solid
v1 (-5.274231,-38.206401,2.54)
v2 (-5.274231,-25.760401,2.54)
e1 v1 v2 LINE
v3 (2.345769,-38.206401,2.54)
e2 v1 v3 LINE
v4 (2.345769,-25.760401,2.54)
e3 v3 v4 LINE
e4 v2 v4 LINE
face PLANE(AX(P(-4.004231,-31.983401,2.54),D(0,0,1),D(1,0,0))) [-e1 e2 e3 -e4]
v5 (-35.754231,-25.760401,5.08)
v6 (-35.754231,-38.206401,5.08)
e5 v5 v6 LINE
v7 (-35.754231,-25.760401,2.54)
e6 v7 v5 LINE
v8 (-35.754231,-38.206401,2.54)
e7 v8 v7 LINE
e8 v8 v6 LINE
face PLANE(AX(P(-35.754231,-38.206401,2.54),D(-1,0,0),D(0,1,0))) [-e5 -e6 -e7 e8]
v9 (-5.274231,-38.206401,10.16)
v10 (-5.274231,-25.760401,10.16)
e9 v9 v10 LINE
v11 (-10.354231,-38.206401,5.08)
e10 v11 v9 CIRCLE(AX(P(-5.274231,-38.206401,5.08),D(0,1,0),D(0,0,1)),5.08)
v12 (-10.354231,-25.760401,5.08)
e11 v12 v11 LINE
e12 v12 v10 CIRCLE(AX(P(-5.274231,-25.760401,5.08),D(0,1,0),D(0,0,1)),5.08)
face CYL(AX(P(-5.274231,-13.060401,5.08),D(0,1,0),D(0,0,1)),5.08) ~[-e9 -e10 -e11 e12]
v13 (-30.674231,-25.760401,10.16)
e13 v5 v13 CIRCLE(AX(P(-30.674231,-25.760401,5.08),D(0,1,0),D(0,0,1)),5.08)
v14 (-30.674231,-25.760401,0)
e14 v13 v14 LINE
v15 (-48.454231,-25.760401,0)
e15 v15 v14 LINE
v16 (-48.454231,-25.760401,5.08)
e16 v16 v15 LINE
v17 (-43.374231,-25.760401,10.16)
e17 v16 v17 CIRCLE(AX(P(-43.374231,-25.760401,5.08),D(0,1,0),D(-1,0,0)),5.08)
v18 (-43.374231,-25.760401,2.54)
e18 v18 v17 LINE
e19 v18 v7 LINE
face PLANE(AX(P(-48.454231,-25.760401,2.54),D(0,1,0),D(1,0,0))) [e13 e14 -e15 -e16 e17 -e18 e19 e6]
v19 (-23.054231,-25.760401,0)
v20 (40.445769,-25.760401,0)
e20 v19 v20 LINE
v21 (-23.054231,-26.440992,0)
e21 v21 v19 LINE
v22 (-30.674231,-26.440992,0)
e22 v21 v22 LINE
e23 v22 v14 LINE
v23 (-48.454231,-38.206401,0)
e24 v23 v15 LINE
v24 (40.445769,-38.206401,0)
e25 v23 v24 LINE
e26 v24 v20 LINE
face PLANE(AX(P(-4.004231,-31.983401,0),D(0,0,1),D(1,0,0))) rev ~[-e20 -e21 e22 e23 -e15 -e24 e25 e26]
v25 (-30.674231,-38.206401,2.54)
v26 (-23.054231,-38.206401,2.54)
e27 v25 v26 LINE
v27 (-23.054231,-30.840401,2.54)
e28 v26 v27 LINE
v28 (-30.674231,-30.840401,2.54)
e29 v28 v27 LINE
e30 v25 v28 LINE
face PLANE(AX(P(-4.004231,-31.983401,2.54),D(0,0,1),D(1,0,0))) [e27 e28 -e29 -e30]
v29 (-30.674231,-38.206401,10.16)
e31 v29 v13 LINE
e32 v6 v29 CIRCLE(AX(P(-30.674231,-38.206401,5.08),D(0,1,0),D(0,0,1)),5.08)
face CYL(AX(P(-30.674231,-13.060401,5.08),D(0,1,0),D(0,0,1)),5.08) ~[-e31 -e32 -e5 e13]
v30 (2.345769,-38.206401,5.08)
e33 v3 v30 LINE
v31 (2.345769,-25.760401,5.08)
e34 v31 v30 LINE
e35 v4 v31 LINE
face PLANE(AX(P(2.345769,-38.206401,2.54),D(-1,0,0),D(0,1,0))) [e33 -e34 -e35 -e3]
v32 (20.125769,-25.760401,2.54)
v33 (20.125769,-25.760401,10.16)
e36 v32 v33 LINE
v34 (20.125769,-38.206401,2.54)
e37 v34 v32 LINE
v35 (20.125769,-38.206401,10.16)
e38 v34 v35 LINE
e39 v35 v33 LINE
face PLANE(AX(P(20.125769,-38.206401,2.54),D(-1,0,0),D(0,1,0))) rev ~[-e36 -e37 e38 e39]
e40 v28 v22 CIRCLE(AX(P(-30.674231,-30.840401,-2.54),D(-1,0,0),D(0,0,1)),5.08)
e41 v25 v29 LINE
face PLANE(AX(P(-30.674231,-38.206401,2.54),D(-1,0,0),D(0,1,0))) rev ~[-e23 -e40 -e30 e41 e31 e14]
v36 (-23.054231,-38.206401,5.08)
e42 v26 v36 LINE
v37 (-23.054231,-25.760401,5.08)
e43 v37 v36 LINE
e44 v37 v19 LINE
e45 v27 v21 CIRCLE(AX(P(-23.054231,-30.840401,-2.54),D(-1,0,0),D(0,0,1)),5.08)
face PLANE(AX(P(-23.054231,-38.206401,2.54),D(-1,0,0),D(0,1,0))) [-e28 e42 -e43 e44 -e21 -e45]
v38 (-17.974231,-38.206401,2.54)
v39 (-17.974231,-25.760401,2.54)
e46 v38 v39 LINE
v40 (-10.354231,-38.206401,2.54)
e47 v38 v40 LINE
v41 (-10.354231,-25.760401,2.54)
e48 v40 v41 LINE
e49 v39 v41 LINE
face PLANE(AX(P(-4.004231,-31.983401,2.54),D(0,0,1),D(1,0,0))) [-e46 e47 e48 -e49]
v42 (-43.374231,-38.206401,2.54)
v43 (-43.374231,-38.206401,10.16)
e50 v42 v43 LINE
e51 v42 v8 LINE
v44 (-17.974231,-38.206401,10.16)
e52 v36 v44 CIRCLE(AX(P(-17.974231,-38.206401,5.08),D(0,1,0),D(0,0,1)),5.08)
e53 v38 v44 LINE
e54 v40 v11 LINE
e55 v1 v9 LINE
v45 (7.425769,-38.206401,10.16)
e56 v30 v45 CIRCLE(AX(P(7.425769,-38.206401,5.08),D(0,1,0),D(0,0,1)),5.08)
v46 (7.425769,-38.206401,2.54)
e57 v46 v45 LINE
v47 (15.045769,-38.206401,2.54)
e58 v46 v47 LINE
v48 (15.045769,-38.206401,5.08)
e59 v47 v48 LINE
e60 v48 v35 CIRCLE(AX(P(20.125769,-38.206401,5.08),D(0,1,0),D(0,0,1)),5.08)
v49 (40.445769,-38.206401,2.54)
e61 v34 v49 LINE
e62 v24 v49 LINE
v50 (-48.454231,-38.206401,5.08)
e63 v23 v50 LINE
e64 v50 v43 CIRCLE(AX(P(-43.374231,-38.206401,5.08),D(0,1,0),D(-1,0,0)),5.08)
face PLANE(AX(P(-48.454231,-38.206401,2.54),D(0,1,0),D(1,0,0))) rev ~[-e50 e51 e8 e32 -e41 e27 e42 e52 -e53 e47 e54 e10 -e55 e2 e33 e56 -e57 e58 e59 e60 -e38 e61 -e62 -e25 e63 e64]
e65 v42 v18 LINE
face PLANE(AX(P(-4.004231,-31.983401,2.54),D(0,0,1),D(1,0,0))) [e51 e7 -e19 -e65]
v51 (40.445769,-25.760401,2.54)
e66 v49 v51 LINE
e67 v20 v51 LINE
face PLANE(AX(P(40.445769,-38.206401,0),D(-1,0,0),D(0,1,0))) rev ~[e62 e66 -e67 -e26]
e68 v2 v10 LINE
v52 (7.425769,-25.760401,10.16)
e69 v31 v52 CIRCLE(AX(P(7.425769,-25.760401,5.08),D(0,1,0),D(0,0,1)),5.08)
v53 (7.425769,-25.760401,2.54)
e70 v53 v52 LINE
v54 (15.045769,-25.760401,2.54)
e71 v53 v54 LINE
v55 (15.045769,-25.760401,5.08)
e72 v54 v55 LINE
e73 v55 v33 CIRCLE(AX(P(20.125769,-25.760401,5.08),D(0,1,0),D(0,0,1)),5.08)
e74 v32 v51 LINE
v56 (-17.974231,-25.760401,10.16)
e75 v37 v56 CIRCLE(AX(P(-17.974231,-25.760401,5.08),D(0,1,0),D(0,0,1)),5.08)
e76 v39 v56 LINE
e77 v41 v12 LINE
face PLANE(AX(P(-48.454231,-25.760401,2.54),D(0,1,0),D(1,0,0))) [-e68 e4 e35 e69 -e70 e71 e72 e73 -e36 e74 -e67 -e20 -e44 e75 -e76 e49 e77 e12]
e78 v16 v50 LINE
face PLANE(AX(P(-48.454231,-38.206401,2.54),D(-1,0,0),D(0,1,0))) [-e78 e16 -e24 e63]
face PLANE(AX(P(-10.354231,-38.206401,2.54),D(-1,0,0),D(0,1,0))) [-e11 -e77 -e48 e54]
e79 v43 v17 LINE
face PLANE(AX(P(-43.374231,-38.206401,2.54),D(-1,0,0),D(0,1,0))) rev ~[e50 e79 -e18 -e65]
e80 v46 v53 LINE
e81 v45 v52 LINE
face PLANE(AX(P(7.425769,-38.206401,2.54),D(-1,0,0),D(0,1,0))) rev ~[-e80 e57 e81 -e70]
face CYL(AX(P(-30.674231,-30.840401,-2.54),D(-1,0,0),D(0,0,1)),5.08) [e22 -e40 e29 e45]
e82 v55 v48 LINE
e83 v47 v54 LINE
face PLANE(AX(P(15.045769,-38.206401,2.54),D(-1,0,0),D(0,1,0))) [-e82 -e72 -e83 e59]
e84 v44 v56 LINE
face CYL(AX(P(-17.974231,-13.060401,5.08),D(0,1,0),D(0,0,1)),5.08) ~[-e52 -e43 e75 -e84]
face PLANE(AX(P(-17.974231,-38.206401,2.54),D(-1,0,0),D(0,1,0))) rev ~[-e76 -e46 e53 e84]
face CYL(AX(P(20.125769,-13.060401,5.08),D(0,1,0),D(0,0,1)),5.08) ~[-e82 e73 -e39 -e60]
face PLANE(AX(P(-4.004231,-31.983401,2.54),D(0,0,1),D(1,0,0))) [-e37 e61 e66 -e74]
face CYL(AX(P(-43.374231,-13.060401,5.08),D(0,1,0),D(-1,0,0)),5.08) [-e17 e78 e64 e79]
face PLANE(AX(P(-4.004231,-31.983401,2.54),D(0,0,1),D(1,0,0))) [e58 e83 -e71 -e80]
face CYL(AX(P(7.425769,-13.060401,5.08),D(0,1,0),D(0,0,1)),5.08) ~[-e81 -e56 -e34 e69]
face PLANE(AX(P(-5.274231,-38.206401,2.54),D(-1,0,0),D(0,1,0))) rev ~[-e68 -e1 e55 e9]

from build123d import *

# Parameters (mm, degrees)
F0_W        = 88.9
F0_H        = 12.446
F1_DEPTH    = 2.54
F2_W        = 5.08
F2_H        = 12.446
F3_DEPTH    = 7.62
F4_T1_DEPTH = 37.846
F4_T3_DEPTH = 7.62


# Not quite as in the source:
# - a fillet or chamfer that OpenCascade refuses, or shapes differently, is made with other operations: its cross-section is extruded or revolved along the edge and cut away or added


with BuildPart() as f1:
    # F0 (on Top) → F1 (new body)
    with BuildSketch(Plane.XY):
        with Locations((-4.0042309799, -31.983400695)):
            Rectangle(F0_W, F0_H)
    extrude(amount=F1_DEPTH)

    # F2 (on face) → F3 (join)
    with BuildSketch(Plane.XY.offset(2.54)):
        with Locations((-45.9142309799, -31.983400695)):
            Rectangle(F2_W, F2_H)
        with Locations((-33.2142309799, -31.983400695)):
            Rectangle(F2_W, F2_H)
        with Locations((-20.5142309799, -31.983400695)):
            Rectangle(F2_W, F2_H)
        with Locations((-7.8142309799, -31.983400695)):
            Rectangle(F2_W, F2_H)
        with Locations((4.8857690201, -31.983400695)):
            Rectangle(F2_W, F2_H)
        with Locations((17.5857690201, -31.983400695)):
            Rectangle(F2_W, F2_H)
    extrude(amount=F3_DEPTH)

    # F4: fillet of radius 5.08 on 7 edges, made by hand

    # F4_s2 → F4_t1 (cut)
    with BuildSketch(Plane.XZ.offset(13.060400695)):
        with BuildLine():
            ThreePointArc((-48.4542309799, 5.08), (-46.9663334283, 8.6721024484), (-43.3742309799, 10.16))
            Line((-43.3742309799, 10.16), (-48.4542309799, 10.16))
            Line((-48.4542309799, 10.16), (-48.4542309799, 5.08))
        make_face()
        with BuildLine():
            ThreePointArc((-30.6742309799, 10.16), (-34.2663334283, 8.6721024484), (-35.7542309799, 5.08))
            Line((-35.7542309799, 5.08), (-35.7542309799, 10.16))
            Line((-35.7542309799, 10.16), (-30.6742309799, 10.16))
        make_face()
        with BuildLine():
            ThreePointArc((-17.9742309799, 10.16), (-21.5663334283, 8.6721024484), (-23.0542309799, 5.08))
            Line((-23.0542309799, 5.08), (-23.0542309799, 10.16))
            Line((-23.0542309799, 10.16), (-17.9742309799, 10.16))
        make_face()
        with BuildLine():
            ThreePointArc((-5.2742309799, 10.16), (-8.8663334283, 8.6721024484), (-10.3542309799, 5.08))
            Line((-10.3542309799, 5.08), (-10.3542309799, 10.16))
            Line((-10.3542309799, 10.16), (-5.2742309799, 10.16))
        make_face()
        with BuildLine():
            ThreePointArc((7.4257690201, 10.16), (3.8336665717, 8.6721024484), (2.3457690201, 5.08))
            Line((2.3457690201, 5.08), (2.3457690201, 10.16))
            Line((2.3457690201, 10.16), (7.4257690201, 10.16))
        make_face()
        with BuildLine():
            ThreePointArc((20.1257690201, 10.16), (16.5336665717, 8.6721024484), (15.0457690201, 5.08))
            Line((15.0457690201, 5.08), (15.0457690201, 10.16))
            Line((15.0457690201, 10.16), (20.1257690201, 10.16))
        make_face()
    extrude(amount=F4_T1_DEPTH, mode=Mode.SUBTRACT)

    # F4_s4 → F4_t3 (cut)
    with BuildSketch(Plane.YZ.offset(-30.6742309799)):
        with BuildLine():
            ThreePointArc((-30.840400695, 2.54), (-27.2482982466, 1.0521024484), (-25.760400695, -2.54))
            Line((-25.760400695, -2.54), (-25.760400695, 2.54))
            Line((-25.760400695, 2.54), (-30.840400695, 2.54))
        make_face()
    extrude(amount=F4_T3_DEPTH, mode=Mode.SUBTRACT)


solid = f1.part
